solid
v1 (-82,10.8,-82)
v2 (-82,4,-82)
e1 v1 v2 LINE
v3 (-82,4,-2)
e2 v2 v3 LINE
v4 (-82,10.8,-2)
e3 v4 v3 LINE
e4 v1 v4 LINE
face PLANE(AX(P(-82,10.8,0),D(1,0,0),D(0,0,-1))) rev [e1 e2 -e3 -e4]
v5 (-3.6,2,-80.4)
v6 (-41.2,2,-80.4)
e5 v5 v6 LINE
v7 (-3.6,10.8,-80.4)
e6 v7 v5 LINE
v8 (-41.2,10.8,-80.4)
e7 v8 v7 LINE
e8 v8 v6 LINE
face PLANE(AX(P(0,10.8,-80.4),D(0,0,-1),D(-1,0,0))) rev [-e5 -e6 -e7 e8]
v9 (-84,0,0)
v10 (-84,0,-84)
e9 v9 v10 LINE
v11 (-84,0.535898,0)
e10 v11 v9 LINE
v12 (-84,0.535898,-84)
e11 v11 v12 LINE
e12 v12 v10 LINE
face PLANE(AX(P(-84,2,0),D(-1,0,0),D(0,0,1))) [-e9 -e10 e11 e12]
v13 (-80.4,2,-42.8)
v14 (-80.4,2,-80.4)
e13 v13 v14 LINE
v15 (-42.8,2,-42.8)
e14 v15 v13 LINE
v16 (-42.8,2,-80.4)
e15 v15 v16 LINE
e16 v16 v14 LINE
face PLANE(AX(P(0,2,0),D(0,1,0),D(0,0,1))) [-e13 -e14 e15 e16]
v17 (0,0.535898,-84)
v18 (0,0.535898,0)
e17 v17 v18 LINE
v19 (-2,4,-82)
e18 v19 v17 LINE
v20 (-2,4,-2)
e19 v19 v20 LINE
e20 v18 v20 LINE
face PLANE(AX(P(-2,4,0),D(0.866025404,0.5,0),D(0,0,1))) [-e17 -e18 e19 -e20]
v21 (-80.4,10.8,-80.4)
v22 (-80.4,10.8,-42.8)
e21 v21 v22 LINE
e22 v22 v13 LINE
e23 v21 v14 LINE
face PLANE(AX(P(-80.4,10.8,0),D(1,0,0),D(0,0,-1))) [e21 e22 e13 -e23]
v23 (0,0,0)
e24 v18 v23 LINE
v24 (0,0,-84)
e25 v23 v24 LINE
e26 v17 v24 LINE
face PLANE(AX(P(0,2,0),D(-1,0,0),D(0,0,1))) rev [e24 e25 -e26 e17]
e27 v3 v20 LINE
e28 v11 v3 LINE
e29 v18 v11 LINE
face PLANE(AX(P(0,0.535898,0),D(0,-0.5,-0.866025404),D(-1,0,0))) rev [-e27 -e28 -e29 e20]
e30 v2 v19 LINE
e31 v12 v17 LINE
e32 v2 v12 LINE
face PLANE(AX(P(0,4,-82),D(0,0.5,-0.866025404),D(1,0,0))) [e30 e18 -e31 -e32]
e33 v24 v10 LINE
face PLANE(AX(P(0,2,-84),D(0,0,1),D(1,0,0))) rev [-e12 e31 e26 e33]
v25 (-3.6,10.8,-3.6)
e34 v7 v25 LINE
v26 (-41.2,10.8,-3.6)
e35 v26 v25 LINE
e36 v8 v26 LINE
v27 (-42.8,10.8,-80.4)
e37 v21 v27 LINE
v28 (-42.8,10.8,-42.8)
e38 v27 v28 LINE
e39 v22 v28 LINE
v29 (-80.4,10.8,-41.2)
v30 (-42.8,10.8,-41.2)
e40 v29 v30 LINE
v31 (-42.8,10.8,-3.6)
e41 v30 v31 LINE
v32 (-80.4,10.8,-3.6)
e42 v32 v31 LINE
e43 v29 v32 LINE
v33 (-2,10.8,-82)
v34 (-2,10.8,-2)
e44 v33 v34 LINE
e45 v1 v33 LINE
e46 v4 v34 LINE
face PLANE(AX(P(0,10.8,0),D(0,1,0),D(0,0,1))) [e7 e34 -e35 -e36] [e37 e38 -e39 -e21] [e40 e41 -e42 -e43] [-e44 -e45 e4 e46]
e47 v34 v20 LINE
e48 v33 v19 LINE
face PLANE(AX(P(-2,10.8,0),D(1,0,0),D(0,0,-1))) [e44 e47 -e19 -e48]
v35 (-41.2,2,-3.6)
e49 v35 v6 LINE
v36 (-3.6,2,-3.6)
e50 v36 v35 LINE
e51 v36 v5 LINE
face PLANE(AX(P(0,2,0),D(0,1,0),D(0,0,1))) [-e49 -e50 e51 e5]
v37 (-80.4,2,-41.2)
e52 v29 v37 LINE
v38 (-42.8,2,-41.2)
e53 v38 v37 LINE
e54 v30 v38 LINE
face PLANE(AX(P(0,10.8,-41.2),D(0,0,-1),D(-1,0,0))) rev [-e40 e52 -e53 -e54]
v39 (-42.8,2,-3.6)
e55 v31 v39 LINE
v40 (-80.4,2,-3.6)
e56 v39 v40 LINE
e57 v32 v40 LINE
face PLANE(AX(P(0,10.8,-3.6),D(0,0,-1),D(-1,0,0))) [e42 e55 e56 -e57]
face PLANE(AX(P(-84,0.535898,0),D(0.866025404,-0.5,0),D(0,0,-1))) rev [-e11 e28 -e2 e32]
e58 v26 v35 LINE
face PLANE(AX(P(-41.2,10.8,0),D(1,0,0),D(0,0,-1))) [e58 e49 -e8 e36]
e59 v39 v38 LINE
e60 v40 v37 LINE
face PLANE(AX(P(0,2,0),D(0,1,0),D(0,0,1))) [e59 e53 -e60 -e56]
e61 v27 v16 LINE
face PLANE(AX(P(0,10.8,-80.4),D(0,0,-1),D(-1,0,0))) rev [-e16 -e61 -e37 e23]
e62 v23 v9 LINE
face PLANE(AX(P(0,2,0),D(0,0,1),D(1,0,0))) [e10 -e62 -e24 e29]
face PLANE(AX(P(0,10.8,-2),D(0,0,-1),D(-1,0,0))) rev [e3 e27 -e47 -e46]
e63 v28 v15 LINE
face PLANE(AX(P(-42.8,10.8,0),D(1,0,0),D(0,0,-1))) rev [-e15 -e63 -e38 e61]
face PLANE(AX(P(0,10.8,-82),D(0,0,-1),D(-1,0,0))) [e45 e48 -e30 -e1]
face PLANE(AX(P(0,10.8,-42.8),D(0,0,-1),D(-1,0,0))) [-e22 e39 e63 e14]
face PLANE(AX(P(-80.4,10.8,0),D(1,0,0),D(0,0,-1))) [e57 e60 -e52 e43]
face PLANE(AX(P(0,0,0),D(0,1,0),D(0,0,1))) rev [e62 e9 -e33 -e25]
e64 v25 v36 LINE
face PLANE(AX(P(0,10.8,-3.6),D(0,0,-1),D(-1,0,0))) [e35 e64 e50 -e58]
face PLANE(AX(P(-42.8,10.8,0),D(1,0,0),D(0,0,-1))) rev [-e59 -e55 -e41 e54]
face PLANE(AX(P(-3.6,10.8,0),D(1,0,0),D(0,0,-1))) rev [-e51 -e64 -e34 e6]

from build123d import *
from OCP.BRepFilletAPI import BRepFilletAPI_MakeChamfer

# Parameters (mm, degrees)
SKICA1_W                = 84
SKICA1_H                = 84
P_IDAT_VYSUNUT_M1_DEPTH = 2
SKICA1_3_W              = 80
SKICA1_3_H              = 80
SKICA1_3_W_2            = 37.6
SKICA1_3_H_2            = 76.8
SKICA1_3_H_3            = 37.6
P_IDAT_VYSUNUT_M2_DEPTH = 10.8
SKICA1_4_W              = 84
SKICA1_4_H              = 84
SKICA1_4_W_2            = 80
SKICA1_4_H_2            = 80
P_IDAT_VYSUNUT_M3_DEPTH = 4
ZKOSEN_2_SIZE           = 3.464101615
ZKOSEN_2_SIZE_2         = 2


with BuildPart() as part:
    # Skica1 → Přidat vysunutím1 (new body)
    with BuildSketch(Plane(origin=(0, 0, 0), x_dir=(1, 0, 0), z_dir=(0, 1, 0))):
        with Locations((-42, 42)):
            Rectangle(SKICA1_W, SKICA1_H)
    extrude(amount=P_IDAT_VYSUNUT_M1_DEPTH)

    # Skica1<3> → Přidat vysunutím2 (add)
    with BuildSketch(Plane(origin=(0, 0, 0), x_dir=(1, 0, 0), z_dir=(0, 1, 0))):
        with Locations((-42, 42)):
            Rectangle(SKICA1_3_W, SKICA1_3_H)
        with Locations((-22.4, 42)):
            Rectangle(SKICA1_3_W_2, SKICA1_3_H_2, mode=Mode.SUBTRACT)
        with Locations((-61.6, 61.6)):
            Rectangle(SKICA1_3_W_2, SKICA1_3_H_3, mode=Mode.SUBTRACT)
        with Locations((-61.6, 22.4)):
            Rectangle(SKICA1_3_W_2, SKICA1_3_H_3, mode=Mode.SUBTRACT)
    extrude(amount=P_IDAT_VYSUNUT_M2_DEPTH)

    # Skica1<4> → Přidat vysunutím3 (add)
    with BuildSketch(Plane(origin=(0, 0, 0), x_dir=(1, 0, 0), z_dir=(0, 1, 0))):
        with Locations((-42, 42)):
            Rectangle(SKICA1_4_W, SKICA1_4_H)
        with Locations((-42, 42)):
            Rectangle(SKICA1_4_W_2, SKICA1_4_H_2, mode=Mode.SUBTRACT)
    extrude(amount=P_IDAT_VYSUNUT_M3_DEPTH)

    # Zkosení2
    zkosen_2_edges_1 = [part.edges().sort_by_distance(p)[0] for p in [
        (-84, 4, -42),
    ]]
    zkosen_2_side_1 = [part.faces().sort_by_distance(p)[0] for p in [
        (-84, 3.96, -42),
    ]]
    zkosen_2_edges_2 = [part.edges().sort_by_distance(p)[0] for p in [
        (-42, 4, 0),
    ]]
    zkosen_2_side_2 = [part.faces().sort_by_distance(p)[0] for p in [
        (-42, 3.96, 0),
    ]]
    zkosen_2_edges_3 = [part.edges().sort_by_distance(p)[0] for p in [
        (0, 4, -42),
    ]]
    zkosen_2_side_3 = [part.faces().sort_by_distance(p)[0] for p in [
        (-0.04, 4, -42),
    ]]
    zkosen_2_edges_4 = [part.edges().sort_by_distance(p)[0] for p in [
        (-42, 4, -84),
    ]]
    zkosen_2_side_4 = [part.faces().sort_by_distance(p)[0] for p in [
        (-42, 3.96, -84),
    ]]
    zkosen_2 = BRepFilletAPI_MakeChamfer(part.part.solid().wrapped)
    for e in zkosen_2_edges_1:
        zkosen_2.Add(ZKOSEN_2_SIZE - 0.0001, ZKOSEN_2_SIZE_2 - 0.0001, e.wrapped, zkosen_2_side_1[0].wrapped)
    for e in zkosen_2_edges_2:
        zkosen_2.Add(ZKOSEN_2_SIZE - 0.0001, ZKOSEN_2_SIZE_2 - 0.0001, e.wrapped, zkosen_2_side_2[0].wrapped)
    for e in zkosen_2_edges_3:
        zkosen_2.Add(ZKOSEN_2_SIZE_2 - 0.0001, ZKOSEN_2_SIZE - 0.0001, e.wrapped, zkosen_2_side_3[0].wrapped)
    for e in zkosen_2_edges_4:
        zkosen_2.Add(ZKOSEN_2_SIZE - 0.0001, ZKOSEN_2_SIZE_2 - 0.0001, e.wrapped, zkosen_2_side_4[0].wrapped)
    add(Compound.cast(zkosen_2.Shape()), mode=Mode.REPLACE)  # a hair under: the kernel refuses the full size


solid = part.part
